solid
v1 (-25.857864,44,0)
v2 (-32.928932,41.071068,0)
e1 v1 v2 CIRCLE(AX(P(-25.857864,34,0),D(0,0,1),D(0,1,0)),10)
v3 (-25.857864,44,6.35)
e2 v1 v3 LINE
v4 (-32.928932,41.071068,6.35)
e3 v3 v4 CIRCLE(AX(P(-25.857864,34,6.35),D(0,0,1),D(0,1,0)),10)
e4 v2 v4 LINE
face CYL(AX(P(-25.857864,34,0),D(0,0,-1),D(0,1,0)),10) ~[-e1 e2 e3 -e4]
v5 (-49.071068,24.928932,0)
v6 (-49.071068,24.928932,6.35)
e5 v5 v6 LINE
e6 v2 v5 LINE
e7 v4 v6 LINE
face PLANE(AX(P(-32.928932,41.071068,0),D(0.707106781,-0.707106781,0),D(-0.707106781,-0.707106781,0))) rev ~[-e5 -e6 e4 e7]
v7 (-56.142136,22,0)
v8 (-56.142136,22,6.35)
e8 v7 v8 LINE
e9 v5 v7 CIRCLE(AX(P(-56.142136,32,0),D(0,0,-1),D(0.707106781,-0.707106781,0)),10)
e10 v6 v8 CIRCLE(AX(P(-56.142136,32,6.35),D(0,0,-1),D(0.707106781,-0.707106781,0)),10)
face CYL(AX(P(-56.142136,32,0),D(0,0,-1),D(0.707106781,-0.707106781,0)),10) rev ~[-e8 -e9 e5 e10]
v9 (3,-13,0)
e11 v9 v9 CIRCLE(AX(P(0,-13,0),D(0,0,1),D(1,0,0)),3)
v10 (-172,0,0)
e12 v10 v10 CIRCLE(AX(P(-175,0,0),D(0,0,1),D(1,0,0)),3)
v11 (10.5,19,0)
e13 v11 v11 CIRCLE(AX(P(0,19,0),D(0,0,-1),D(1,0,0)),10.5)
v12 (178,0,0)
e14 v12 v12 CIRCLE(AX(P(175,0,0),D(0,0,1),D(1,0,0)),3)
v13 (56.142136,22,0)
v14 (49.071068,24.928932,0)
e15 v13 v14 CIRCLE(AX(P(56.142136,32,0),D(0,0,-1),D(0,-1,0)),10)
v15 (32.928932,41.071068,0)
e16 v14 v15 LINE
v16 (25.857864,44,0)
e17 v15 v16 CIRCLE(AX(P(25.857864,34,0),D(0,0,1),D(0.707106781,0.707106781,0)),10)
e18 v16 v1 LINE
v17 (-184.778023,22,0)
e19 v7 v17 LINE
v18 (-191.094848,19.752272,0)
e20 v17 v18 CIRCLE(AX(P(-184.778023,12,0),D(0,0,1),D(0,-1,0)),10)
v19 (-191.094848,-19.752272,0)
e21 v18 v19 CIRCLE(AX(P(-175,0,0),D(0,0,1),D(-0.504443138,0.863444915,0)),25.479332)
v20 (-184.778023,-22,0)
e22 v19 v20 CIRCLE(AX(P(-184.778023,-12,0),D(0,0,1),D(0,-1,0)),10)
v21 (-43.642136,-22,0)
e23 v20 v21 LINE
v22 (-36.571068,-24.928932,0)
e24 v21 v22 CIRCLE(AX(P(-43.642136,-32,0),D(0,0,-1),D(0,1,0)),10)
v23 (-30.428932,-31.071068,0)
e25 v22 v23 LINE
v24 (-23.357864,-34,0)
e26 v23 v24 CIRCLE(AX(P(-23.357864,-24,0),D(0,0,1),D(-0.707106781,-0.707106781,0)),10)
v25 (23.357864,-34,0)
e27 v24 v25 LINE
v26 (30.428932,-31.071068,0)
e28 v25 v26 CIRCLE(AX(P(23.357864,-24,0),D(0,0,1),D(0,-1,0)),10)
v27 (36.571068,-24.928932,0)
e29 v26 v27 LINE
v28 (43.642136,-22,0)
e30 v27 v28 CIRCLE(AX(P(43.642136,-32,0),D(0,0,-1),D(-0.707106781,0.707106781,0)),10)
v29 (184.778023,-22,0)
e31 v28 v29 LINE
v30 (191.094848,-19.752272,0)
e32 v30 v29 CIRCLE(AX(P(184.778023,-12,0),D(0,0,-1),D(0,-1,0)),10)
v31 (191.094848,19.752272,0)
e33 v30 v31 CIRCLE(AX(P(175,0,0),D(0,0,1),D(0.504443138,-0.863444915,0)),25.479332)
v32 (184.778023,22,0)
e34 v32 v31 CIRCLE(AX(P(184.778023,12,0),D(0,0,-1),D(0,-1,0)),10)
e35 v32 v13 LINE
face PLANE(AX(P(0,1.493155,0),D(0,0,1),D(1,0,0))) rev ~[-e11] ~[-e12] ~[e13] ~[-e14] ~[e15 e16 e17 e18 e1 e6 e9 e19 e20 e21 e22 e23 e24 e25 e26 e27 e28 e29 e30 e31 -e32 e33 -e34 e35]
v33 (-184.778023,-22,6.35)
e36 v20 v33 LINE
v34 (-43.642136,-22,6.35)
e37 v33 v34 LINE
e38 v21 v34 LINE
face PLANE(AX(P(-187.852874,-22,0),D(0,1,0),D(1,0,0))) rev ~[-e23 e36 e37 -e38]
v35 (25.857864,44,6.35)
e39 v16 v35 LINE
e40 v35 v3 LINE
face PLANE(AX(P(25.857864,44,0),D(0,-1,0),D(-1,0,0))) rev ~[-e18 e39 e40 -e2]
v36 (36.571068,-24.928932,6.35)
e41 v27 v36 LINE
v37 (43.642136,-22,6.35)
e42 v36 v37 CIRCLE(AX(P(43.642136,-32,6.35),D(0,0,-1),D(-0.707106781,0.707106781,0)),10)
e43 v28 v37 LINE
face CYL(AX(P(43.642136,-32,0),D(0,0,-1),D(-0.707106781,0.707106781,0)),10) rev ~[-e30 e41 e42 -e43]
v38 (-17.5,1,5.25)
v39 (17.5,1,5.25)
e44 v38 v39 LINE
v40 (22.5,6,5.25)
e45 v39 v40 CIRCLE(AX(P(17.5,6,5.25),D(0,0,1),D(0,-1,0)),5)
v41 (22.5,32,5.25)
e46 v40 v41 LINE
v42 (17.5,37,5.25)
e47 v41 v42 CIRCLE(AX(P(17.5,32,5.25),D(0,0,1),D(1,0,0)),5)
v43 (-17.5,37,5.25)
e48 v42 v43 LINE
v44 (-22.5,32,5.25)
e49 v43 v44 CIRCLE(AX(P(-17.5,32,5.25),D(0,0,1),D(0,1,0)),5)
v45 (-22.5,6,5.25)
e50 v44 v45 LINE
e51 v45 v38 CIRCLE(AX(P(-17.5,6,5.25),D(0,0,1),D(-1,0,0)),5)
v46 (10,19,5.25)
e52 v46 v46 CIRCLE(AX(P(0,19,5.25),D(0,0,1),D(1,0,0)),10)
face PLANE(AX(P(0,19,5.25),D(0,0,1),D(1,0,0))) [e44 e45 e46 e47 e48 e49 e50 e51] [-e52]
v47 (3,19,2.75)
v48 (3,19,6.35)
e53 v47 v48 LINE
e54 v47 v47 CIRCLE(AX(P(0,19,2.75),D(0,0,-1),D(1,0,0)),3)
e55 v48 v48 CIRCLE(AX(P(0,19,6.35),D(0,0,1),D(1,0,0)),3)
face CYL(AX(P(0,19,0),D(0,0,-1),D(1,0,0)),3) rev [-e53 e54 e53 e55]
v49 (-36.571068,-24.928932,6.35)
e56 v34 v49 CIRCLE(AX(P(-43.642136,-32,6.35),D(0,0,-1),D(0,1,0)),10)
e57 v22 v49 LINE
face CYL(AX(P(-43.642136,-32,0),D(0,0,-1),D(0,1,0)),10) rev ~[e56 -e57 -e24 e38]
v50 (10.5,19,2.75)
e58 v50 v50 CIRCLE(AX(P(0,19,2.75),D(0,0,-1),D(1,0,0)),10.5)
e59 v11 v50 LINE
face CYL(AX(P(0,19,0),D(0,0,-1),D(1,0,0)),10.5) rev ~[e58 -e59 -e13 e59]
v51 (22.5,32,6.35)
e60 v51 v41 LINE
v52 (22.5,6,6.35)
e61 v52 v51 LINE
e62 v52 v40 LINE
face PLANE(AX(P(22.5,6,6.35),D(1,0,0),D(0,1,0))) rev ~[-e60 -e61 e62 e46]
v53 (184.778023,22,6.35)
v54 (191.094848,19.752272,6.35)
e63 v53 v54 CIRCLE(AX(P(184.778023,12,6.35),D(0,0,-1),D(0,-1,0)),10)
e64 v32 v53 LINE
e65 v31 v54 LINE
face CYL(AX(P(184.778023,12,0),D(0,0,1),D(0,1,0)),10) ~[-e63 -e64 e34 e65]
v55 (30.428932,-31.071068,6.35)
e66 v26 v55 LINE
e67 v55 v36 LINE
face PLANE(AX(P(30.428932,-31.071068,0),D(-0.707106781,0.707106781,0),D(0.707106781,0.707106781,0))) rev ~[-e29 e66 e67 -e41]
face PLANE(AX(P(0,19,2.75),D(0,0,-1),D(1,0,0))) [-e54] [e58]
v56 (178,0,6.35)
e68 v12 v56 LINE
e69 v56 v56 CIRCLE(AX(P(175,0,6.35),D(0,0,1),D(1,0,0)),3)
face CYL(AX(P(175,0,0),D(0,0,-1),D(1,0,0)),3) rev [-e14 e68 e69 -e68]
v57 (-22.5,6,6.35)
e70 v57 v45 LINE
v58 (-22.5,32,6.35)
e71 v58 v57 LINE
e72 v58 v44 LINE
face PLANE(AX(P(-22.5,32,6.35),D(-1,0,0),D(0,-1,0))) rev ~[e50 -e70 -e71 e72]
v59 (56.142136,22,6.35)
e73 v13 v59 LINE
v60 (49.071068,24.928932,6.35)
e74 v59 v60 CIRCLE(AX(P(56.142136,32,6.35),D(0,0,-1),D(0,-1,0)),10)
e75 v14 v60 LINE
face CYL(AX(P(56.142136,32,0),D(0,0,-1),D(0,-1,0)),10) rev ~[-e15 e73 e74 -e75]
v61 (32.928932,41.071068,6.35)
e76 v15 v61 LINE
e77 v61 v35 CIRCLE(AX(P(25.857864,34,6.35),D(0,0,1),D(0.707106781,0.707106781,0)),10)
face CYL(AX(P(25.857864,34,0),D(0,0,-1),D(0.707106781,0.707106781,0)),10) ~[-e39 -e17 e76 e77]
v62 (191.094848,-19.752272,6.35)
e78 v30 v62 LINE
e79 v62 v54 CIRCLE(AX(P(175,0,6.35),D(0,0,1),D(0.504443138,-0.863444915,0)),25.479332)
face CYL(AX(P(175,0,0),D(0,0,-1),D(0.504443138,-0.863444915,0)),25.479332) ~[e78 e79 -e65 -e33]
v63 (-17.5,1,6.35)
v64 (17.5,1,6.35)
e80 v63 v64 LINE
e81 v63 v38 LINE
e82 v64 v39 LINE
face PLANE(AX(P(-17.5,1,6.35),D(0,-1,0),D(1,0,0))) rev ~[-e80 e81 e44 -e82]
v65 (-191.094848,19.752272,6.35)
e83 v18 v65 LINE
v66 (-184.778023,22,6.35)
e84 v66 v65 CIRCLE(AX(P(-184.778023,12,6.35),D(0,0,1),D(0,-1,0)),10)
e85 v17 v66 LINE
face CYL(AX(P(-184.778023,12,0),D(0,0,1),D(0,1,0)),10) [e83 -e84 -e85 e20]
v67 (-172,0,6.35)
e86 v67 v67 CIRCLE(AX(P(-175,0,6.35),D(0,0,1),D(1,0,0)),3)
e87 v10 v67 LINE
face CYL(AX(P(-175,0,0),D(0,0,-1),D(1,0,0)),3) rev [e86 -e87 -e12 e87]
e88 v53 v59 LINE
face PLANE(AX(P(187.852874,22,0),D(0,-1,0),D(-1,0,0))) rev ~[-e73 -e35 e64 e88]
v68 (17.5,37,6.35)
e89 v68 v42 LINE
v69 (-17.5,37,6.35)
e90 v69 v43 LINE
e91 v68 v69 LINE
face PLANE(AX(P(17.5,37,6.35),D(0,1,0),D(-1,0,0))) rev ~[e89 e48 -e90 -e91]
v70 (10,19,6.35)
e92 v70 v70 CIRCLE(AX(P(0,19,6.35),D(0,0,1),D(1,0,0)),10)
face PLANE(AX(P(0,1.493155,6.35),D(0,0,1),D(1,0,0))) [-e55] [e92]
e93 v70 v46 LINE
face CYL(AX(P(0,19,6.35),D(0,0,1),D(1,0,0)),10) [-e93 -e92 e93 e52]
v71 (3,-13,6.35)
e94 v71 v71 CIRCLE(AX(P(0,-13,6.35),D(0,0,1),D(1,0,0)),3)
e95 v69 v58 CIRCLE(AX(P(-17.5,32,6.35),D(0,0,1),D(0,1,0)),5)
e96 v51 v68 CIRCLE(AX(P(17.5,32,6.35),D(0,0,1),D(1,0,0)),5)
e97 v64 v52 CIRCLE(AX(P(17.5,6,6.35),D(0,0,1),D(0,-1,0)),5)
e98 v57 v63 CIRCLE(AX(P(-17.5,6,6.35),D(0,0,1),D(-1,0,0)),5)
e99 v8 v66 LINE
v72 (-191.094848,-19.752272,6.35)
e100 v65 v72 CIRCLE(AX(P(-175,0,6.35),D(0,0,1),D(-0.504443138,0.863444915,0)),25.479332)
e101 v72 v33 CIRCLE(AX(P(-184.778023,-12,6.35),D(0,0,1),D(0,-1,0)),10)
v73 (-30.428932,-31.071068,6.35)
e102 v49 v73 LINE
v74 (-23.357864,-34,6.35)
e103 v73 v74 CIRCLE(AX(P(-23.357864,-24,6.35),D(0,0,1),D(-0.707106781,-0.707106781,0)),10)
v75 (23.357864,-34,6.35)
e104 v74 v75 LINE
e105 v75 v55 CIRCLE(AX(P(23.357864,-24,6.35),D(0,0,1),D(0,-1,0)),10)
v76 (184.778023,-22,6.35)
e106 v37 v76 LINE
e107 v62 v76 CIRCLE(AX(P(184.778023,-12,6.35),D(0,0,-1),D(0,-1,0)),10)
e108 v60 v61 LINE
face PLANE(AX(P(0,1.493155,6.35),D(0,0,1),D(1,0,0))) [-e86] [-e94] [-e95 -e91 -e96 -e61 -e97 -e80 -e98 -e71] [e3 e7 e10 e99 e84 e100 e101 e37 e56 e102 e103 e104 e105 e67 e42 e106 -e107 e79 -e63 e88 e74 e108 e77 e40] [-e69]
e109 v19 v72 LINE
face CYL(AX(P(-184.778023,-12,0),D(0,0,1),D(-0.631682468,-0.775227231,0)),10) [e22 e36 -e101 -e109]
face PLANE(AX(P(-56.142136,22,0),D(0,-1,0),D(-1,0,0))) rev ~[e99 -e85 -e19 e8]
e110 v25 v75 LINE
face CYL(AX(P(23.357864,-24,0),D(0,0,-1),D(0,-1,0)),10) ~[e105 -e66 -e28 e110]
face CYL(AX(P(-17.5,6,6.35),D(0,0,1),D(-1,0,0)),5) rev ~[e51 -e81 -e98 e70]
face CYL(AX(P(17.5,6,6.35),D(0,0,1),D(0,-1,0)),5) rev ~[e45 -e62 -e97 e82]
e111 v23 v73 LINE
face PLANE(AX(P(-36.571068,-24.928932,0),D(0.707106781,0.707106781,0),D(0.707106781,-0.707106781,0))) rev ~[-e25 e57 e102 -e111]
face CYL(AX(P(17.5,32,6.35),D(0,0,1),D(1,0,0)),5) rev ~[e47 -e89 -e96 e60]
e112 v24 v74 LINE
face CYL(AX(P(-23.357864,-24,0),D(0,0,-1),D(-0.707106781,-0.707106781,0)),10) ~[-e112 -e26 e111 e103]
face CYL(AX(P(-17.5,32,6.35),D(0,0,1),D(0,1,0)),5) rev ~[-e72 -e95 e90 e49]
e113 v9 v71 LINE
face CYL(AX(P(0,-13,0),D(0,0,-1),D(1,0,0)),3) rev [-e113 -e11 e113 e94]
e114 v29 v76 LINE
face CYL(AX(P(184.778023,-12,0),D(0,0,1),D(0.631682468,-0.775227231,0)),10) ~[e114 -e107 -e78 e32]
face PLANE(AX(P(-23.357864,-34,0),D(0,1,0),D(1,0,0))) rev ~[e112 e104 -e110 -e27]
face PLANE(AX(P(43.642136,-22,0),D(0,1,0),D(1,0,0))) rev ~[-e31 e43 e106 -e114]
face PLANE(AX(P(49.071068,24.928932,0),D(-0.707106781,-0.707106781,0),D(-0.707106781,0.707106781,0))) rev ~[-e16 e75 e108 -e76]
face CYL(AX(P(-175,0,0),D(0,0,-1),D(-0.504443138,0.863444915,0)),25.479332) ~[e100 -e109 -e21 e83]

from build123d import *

# Parameters (mm, degrees)
F0_R     = 3
F1_DEPTH = 6.35
F2_R     = 10
F3_R     = 10.5
F4_DEPTH = 2.75
F5_R     = 10
F6_DEPTH = 1.1


# Not quite as in the source:
# - a feature names something its author has since deleted; it is built from what else it names


with BuildPart() as f1:
    # F0 (on Top) → F1 (new body)
    with BuildSketch(Plane.XY):
        with BuildLine():
            Line((25.8578643763, 44), (0, 44))
            Line((0, 44), (-25.8578643763, 44))
            ThreePointArc((-25.8578643763, 44), (-29.6846986999, 43.2387953251), (-32.9289321881, 41.0710678119))
            Line((-32.9289321881, 41.0710678119), (-49.0710678119, 24.9289321881))
            ThreePointArc((-49.0710678119, 24.9289321881), (-52.3153013001, 22.7612046749), (-56.1421356237, 22))
            Line((-56.1421356237, 22), (-187.8528743982, 22))
            ThreePointArc((-187.8528743982, 22), (-200.4793324147, 0), (-187.8528743982, -22))
            Line((-187.8528743982, -22), (-43.6421356237, -22))
            ThreePointArc((-43.6421356237, -22), (-39.8153013001, -22.7612046749), (-36.5710678119, -24.9289321881))
            Line((-36.5710678119, -24.9289321881), (-30.4289321881, -31.0710678119))
            ThreePointArc((-30.4289321881, -31.0710678119), (-27.1846986999, -33.2387953251), (-23.3578643763, -34))
            Line((-23.3578643763, -34), (0, -34))
            Line((0, -34), (23.3578643763, -34))
            ThreePointArc((23.3578643763, -34), (27.1846986999, -33.2387953251), (30.4289321881, -31.0710678119))
            Line((30.4289321881, -31.0710678119), (36.5710678119, -24.9289321881))
            ThreePointArc((36.5710678119, -24.9289321881), (39.8153013001, -22.7612046749), (43.6421356237, -22))
            Line((43.6421356237, -22), (187.8528743982, -22))
            ThreePointArc((187.8528743982, -22), (200.4793324147, 0), (187.8528743982, 22))
            Line((187.8528743982, 22), (56.1421356237, 22))
            ThreePointArc((56.1421356237, 22), (52.3153013001, 22.7612046749), (49.0710678119, 24.9289321881))
            Line((49.0710678119, 24.9289321881), (32.9289321881, 41.0710678119))
            ThreePointArc((32.9289321881, 41.0710678119), (29.6846986999, 43.2387953251), (25.8578643763, 44))
        make_face()
        with Locations((-175, 0)):
            Circle(F0_R, mode=Mode.SUBTRACT)
        with Locations((0, -13)):
            Circle(F0_R, mode=Mode.SUBTRACT)
        with Locations((175, 0)):
            Circle(F0_R, mode=Mode.SUBTRACT)
        with Locations((0, 19)):
            Circle(F0_R, mode=Mode.SUBTRACT)
    extrude(amount=F1_DEPTH)

    # F2
    f2_edges = [f1.edges().sort_by_distance(p)[0] for p in [
        (-187.852874, 22, 3.175),
        (-187.852874, -22, 3.175),
        (187.852874, -22, 3.175),
        (187.852874, 22, 3.175),
    ]]
    fillet(f2_edges, radius=F2_R)

    # F3 (on face) → F4 (cut)
    with BuildSketch(Plane(origin=(0, 0, 0), x_dir=(1, 0, 0), z_dir=(0, 0, -1))):
        with Locations((0, -19)):
            Circle(F3_R)
    extrude(amount=-F4_DEPTH, mode=Mode.SUBTRACT)

    # F5 (on face) → F6 (cut)
    with BuildSketch(Plane.XY.offset(6.35)):
        with BuildLine():
            ThreePointArc((22.5, 32), (21.0355339059, 35.5355339059), (17.5, 37))
            Line((17.5, 37), (-17.5, 37))
            ThreePointArc((-17.5, 37), (-21.0355339059, 35.5355339059), (-22.5, 32))
            Line((-22.5, 32), (-22.5, 6))
            ThreePointArc((-22.5, 6), (-21.0355339059, 2.4644660941), (-17.5, 1))
            Line((-17.5, 1), (17.5, 1))
            ThreePointArc((17.5, 1), (21.0355339059, 2.4644660941), (22.5, 6))
            Line((22.5, 6), (22.5, 32))
        make_face()
        with Locations((0, 19)):
            Circle(F5_R, mode=Mode.SUBTRACT)
    extrude(amount=-F6_DEPTH, mode=Mode.SUBTRACT)


solid = f1.part
